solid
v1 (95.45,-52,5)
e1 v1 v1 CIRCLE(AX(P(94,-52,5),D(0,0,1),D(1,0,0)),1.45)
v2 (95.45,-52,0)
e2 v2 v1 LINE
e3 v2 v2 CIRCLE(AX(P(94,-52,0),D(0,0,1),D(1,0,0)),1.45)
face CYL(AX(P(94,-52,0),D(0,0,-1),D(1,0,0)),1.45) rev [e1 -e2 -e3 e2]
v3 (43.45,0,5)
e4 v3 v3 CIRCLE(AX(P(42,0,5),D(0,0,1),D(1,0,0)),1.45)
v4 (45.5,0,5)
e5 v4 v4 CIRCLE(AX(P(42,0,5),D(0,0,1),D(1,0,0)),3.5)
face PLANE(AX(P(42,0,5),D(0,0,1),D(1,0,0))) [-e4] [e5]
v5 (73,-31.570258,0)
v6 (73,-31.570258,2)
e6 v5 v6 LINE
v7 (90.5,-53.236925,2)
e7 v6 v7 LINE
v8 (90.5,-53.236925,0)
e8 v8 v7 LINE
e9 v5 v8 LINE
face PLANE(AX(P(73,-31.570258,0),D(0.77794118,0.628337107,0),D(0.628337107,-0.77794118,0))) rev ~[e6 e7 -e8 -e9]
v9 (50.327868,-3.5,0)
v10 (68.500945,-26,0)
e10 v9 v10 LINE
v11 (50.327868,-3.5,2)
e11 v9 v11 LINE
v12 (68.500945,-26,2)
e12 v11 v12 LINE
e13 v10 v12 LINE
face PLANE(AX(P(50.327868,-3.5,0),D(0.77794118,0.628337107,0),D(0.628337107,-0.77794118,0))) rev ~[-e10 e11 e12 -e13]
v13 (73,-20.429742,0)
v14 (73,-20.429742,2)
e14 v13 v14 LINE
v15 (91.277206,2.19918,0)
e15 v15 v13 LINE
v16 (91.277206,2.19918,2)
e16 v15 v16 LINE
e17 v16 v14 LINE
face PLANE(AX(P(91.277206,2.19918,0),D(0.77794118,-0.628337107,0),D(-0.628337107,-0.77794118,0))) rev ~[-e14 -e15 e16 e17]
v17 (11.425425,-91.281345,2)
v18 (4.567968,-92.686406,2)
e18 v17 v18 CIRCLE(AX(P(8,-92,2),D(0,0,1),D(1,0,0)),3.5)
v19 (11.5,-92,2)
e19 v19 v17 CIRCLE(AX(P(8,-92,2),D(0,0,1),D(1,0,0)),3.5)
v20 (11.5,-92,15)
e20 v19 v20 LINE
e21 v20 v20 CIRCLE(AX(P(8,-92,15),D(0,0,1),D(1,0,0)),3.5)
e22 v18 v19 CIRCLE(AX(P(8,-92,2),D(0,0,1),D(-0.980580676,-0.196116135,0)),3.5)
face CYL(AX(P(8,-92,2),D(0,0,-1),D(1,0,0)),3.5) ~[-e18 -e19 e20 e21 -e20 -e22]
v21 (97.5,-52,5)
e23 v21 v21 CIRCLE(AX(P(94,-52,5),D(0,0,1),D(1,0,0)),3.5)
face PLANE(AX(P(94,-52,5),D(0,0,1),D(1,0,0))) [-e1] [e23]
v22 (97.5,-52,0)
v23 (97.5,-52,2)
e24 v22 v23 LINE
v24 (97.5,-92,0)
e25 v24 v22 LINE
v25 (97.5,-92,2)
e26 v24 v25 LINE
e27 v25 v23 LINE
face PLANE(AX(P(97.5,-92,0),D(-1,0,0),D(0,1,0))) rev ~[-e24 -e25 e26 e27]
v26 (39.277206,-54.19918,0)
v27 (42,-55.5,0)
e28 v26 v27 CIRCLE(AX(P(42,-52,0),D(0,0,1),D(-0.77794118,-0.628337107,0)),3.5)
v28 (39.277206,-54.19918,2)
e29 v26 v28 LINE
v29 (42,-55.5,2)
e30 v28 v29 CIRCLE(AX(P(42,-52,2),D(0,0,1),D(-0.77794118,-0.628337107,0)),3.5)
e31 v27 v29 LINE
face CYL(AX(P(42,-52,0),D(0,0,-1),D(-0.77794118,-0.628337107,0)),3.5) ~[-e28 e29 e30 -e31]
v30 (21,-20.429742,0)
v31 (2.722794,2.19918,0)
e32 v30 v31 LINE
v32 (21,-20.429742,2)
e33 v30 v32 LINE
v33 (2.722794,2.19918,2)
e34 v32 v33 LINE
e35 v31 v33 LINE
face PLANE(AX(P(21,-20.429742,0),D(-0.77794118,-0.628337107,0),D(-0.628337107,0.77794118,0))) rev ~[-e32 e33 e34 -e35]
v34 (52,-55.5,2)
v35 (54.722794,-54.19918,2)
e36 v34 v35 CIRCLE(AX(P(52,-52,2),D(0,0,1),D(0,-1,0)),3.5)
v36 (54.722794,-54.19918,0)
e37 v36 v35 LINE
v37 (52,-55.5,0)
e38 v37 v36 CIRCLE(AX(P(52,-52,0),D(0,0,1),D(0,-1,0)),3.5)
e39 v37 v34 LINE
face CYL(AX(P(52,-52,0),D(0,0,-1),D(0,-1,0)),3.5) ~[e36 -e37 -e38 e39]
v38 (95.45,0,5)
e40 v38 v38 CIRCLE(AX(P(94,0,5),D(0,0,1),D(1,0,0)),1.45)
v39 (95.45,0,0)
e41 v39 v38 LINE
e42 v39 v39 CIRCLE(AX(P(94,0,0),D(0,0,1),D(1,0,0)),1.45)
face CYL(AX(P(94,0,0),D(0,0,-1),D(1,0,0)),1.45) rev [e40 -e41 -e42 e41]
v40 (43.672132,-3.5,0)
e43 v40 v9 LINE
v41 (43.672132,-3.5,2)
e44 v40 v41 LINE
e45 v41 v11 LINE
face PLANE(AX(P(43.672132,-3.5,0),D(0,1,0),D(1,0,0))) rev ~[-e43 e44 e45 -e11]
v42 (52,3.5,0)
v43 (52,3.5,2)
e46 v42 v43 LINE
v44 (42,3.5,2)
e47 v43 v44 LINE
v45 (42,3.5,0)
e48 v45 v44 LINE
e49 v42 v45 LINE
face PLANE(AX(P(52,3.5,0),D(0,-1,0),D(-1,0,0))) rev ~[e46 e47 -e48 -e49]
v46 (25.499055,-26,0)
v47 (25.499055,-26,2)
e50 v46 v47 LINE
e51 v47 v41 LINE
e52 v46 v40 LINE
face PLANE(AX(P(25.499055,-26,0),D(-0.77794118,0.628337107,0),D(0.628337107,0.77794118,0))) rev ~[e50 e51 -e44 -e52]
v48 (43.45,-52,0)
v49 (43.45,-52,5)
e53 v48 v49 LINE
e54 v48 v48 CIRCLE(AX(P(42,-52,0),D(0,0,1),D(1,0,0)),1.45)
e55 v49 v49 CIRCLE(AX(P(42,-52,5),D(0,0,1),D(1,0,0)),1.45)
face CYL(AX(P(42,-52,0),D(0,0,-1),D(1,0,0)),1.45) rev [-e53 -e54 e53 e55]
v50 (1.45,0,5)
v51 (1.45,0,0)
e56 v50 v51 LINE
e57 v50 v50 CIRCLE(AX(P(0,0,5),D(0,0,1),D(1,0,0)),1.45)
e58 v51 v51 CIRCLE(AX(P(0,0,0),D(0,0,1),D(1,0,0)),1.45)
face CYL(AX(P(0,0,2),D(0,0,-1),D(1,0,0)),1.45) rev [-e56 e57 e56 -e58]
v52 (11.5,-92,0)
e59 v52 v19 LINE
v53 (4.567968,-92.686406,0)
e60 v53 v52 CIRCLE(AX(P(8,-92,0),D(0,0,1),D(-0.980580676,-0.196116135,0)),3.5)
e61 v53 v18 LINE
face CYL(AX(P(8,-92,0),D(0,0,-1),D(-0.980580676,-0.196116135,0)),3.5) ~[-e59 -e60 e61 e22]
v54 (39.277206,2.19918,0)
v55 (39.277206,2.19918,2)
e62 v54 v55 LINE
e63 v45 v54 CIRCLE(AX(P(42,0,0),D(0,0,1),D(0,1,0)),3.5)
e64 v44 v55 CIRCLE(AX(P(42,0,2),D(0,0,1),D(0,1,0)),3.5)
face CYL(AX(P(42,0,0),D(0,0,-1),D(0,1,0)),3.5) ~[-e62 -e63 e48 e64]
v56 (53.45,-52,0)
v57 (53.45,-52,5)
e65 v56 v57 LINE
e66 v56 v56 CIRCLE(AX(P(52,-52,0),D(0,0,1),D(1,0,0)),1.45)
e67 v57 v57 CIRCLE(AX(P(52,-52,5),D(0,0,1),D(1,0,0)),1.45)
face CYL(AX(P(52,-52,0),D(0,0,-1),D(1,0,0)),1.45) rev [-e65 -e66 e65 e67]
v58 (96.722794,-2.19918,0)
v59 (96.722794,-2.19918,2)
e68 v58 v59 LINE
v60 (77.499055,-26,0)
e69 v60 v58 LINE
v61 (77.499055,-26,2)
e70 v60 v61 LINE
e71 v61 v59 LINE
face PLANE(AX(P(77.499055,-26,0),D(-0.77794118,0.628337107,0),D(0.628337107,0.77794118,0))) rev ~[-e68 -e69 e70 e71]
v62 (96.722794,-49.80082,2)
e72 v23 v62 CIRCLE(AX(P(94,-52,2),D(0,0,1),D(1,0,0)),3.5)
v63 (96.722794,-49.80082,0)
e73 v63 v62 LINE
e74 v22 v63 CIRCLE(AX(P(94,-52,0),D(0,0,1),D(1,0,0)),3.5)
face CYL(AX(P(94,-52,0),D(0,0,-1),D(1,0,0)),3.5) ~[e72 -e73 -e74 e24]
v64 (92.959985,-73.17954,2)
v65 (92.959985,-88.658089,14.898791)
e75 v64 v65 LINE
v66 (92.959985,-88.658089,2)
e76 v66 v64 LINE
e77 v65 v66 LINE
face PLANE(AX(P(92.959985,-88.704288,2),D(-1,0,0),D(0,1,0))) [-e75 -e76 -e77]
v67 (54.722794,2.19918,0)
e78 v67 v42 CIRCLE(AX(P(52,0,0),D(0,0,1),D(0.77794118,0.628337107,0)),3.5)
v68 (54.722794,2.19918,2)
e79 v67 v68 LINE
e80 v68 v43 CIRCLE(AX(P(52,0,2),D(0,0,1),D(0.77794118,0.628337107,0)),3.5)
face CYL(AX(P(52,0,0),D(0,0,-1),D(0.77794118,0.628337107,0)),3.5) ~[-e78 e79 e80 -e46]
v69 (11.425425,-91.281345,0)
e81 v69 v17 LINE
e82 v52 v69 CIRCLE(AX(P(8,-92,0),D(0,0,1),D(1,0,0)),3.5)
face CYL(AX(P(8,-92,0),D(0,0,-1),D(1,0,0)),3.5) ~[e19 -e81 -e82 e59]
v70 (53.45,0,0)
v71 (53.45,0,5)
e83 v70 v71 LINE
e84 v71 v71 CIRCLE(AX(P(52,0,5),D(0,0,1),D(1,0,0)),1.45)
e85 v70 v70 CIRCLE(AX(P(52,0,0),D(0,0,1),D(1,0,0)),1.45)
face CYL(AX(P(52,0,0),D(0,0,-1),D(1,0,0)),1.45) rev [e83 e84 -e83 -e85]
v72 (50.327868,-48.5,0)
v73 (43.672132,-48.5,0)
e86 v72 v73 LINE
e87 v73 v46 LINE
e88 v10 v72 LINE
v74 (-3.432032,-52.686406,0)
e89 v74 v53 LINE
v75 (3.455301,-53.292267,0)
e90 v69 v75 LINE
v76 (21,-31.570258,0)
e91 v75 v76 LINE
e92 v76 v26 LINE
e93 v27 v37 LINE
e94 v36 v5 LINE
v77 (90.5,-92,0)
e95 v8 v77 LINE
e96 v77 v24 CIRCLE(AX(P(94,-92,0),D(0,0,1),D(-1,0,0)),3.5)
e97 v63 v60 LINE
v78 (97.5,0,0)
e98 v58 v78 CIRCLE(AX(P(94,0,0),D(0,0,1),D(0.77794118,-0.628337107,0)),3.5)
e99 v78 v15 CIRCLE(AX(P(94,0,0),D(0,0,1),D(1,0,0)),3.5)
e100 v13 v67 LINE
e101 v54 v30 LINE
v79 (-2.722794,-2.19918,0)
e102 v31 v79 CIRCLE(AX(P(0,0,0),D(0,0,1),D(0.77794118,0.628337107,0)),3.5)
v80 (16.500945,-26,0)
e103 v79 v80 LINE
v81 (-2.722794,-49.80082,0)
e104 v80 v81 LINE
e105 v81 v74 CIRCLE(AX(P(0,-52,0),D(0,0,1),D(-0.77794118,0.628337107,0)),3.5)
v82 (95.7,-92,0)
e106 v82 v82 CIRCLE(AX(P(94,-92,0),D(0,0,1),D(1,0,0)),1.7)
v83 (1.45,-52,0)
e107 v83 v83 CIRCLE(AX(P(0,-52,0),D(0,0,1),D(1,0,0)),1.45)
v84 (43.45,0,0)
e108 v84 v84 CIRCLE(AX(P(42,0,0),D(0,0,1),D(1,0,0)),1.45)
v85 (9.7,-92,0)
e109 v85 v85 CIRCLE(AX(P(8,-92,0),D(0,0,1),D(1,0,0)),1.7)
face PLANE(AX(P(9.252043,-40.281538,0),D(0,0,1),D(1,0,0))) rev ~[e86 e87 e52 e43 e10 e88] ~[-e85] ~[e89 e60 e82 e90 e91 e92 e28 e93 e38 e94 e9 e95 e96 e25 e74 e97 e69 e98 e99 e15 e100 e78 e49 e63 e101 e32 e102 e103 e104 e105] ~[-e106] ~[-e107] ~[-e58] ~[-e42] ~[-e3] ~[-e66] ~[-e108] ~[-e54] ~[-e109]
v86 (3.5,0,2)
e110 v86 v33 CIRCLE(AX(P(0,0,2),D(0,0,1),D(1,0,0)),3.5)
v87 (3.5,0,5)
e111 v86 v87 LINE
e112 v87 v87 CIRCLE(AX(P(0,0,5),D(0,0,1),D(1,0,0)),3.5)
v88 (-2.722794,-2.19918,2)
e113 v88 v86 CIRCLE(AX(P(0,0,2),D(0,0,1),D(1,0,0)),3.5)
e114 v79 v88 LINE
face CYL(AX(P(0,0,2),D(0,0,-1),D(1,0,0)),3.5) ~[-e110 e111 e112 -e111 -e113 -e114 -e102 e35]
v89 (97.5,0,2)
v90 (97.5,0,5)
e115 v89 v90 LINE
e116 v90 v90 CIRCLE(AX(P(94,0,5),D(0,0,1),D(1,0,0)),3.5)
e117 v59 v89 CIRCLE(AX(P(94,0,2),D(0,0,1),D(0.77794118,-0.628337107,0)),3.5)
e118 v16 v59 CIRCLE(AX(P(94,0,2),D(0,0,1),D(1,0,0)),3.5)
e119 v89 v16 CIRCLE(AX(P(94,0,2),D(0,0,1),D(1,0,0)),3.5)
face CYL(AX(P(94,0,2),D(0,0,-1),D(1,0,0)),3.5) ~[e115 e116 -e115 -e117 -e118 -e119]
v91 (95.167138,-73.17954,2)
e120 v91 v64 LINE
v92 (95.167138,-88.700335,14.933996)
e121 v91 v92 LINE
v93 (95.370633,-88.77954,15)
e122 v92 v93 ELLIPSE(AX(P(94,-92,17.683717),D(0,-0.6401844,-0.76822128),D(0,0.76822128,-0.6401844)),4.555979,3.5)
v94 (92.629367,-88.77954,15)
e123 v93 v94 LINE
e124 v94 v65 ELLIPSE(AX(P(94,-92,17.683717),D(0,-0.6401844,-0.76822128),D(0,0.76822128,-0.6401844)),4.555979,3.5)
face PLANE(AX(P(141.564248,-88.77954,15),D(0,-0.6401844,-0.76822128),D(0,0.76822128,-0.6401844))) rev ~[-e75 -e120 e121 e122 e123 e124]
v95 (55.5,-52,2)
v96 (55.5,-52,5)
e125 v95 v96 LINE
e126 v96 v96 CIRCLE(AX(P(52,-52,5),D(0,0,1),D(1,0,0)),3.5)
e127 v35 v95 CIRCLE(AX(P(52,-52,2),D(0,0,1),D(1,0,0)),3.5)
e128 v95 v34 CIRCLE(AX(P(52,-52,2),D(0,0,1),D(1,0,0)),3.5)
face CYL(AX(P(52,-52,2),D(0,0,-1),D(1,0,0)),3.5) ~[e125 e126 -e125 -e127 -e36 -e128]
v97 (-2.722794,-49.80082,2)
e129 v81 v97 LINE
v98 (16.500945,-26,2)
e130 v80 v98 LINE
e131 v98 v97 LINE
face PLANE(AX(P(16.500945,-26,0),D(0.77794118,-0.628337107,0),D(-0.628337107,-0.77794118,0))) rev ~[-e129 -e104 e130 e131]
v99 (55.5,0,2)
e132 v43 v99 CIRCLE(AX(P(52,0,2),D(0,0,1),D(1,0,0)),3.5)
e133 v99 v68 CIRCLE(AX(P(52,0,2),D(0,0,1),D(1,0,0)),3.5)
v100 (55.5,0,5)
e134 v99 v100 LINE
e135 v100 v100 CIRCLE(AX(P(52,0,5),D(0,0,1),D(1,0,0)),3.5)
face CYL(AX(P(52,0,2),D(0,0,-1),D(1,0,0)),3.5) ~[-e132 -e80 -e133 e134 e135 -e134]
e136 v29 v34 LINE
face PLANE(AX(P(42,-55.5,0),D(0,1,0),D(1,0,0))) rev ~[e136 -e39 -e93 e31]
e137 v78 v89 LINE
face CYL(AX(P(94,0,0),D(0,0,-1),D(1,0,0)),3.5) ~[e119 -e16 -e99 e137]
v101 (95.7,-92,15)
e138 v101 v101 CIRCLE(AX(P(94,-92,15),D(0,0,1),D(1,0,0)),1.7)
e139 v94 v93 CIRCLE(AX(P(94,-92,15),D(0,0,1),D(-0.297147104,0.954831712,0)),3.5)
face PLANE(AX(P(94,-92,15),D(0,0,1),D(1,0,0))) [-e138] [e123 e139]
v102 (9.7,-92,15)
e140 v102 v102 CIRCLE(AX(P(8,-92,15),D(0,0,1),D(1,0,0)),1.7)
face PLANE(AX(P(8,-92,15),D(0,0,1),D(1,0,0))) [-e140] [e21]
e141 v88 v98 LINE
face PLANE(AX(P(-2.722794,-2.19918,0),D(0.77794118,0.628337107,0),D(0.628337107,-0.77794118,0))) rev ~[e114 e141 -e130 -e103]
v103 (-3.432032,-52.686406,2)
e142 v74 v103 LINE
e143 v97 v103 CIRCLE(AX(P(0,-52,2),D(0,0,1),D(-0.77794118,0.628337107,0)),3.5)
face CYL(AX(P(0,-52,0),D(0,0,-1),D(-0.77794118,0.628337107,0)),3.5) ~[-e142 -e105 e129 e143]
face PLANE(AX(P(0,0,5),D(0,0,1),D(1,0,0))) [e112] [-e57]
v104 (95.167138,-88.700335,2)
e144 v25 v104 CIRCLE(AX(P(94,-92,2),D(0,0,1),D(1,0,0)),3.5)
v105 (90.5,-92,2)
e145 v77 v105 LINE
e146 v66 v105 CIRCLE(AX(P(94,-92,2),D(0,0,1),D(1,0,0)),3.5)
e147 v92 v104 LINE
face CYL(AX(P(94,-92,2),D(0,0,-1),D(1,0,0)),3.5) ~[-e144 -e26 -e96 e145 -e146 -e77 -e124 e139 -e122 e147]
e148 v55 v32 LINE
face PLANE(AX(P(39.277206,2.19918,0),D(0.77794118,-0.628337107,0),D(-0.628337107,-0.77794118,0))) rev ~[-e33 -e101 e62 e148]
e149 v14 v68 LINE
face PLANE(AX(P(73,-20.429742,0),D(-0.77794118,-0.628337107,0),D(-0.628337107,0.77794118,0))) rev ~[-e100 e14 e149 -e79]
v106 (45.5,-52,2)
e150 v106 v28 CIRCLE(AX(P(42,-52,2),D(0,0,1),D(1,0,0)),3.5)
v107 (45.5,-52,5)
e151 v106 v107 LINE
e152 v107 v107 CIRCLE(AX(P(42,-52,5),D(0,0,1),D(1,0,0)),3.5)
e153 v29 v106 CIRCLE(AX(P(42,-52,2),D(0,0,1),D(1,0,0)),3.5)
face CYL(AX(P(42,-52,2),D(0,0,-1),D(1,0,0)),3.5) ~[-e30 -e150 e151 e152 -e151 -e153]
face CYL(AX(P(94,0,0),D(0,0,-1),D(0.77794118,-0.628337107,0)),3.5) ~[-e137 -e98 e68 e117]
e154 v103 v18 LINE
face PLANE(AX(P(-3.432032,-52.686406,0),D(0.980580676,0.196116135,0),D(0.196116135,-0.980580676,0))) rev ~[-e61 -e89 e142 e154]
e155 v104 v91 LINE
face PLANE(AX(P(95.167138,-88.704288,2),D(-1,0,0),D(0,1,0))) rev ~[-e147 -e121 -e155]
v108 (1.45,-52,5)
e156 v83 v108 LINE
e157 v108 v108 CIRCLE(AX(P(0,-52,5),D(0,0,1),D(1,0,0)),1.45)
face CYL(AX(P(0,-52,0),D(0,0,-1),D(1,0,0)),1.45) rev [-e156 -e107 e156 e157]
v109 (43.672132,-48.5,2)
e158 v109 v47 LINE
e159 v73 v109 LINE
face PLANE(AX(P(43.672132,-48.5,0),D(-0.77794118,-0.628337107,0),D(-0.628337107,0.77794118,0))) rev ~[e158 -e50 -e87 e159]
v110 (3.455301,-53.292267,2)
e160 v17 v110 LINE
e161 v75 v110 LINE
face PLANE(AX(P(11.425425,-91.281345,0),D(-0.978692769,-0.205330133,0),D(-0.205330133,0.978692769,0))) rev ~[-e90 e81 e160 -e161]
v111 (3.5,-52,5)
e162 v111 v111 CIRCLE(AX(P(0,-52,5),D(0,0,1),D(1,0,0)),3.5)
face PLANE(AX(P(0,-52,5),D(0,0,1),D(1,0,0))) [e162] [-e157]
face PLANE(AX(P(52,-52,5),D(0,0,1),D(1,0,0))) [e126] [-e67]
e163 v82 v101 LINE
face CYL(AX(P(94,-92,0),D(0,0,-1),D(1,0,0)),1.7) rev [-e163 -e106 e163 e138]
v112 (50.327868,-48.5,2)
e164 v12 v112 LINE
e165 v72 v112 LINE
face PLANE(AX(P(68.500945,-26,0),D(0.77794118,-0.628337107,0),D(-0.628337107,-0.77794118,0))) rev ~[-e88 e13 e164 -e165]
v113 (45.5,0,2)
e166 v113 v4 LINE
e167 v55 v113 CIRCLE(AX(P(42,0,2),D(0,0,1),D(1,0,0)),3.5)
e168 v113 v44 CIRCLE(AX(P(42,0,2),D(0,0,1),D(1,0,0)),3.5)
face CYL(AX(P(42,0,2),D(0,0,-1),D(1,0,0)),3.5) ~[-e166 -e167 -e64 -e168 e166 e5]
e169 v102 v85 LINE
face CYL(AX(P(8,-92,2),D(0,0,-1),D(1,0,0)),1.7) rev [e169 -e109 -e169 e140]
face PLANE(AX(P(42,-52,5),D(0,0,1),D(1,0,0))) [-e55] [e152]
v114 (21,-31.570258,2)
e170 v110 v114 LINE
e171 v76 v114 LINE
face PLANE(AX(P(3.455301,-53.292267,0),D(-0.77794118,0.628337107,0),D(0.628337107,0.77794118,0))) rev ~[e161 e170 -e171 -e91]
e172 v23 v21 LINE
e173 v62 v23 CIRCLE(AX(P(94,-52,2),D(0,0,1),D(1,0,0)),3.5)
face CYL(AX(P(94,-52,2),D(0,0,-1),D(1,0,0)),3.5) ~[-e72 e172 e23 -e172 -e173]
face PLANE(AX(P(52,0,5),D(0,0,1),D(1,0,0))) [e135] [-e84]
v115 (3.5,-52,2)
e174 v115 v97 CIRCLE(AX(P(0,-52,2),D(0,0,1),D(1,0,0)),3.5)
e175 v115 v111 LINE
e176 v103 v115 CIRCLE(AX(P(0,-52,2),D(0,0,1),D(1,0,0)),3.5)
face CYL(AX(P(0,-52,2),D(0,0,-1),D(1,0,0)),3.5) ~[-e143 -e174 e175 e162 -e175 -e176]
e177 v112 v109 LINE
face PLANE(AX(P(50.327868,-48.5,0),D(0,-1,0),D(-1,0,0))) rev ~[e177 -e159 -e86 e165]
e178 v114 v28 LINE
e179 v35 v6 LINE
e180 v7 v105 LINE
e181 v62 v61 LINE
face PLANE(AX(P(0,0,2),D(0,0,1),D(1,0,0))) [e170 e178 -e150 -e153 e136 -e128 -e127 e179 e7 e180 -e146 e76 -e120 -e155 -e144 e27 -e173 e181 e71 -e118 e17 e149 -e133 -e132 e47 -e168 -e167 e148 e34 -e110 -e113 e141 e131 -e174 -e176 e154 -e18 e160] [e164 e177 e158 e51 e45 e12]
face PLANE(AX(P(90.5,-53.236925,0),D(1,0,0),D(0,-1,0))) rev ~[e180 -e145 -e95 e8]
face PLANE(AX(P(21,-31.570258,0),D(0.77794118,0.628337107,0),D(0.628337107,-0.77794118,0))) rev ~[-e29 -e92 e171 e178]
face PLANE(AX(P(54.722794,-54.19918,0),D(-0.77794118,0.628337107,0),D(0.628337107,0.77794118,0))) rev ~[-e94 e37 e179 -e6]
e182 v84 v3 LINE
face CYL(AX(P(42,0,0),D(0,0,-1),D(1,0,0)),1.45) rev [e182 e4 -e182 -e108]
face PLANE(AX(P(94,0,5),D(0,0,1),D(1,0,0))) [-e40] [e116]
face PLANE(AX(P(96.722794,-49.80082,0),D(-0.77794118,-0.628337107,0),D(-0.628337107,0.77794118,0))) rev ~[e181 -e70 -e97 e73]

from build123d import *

# Parameters (mm, degrees)
F0_R        = 1.45
F0_R_2      = 1.7
F1_DEPTH    = 2
F2_R        = 3.5
F2_R_2      = 1.45
F3_DEPTH    = 3
F4_R        = 3.5
F4_R_2      = 1.7
F5_DEPTH    = 13
F6_W        = 2.2071525455
F6_H        = 17.9247483611
F7_DEPTH    = 13
F8_T4_DEPTH = 95.0013732124


# Not quite as in the source:
# - a fillet or chamfer that OpenCascade refuses, or shapes differently, is made with other operations: its cross-section is extruded or revolved along the edge and cut away or added


with BuildPart() as f1:
    # F0 (on Top) → F1 (new body)
    with BuildSketch(Plane.XY):
        with BuildLine():
            Line((21, -31.5702583224), (16.5009452012, -26))
            Line((16.5009452012, -26), (-2.7227941307, -49.8008201252))
            ThreePointArc((-2.7227941307, -49.8008201252), (0, -48.5), (2.7227941307, -49.8008201252))
            ThreePointArc((2.7227941307, -49.8008201252), (3.2999832922, -50.8337623436), (3.5, -52))
            ThreePointArc((3.5, -52), (3.4691335198, -52.4638023524), (3.3770785016, -52.9194241642))
            Line((3.3770785016, -52.9194241642), (3.4553009961, -53.2922666129))
            Line((3.4553009961, -53.2922666129), (21, -31.5702583224))
        make_face()
        with BuildLine():
            ThreePointArc((2.7227941307, 2.1991798748), (3.2999832922, 1.1662376564), (3.5, 0))
            ThreePointArc((3.5, 0), (1.1662376564, -3.2999832922), (-2.7227941307, -2.1991798748))
            Line((-2.7227941307, -2.1991798748), (16.5009452012, -26))
            Line((16.5009452012, -26), (21, -20.4297416776))
            Line((21, -20.4297416776), (2.7227941307, 2.1991798748))
        make_face()
        with BuildLine():
            Line((39.2772058693, 2.1991798748), (21, -20.4297416776))
            Line((21, -20.4297416776), (25.4990547988, -26))
            Line((25.4990547988, -26), (43.6721317219, -3.5))
            Line((43.6721317219, -3.5), (42, -3.5))
            ThreePointArc((42, -3.5), (38.841904881, -1.5087860084), (39.2772058693, 2.1991798748))
        make_face()
        Polygon((25.4990547988, -26), (21, -20.4297416776), (16.5009452012, -26), (21, -31.5702583224), align=None)
        with BuildLine():
            Line((43.6721317219, -48.5), (25.4990547988, -26))
            Line((25.4990547988, -26), (21, -31.5702583224))
            Line((21, -31.5702583224), (39.2772058693, -54.1991798748))
            ThreePointArc((39.2772058693, -54.1991798748), (38.841904881, -50.4912139916), (42, -48.5))
            Line((42, -48.5), (43.6721317219, -48.5))
        make_face()
        with BuildLine():
            Line((50.3278682781, -48.5), (43.6721317219, -48.5))
            Line((43.6721317219, -48.5), (44.7227941307, -49.8008201252))
            ThreePointArc((44.7227941307, -49.8008201252), (45.2999832922, -50.8337623436), (45.5, -52))
            ThreePointArc((45.5, -52), (44.4748737342, -54.4748737342), (42, -55.5))
            Line((42, -55.5), (52, -55.5))
            ThreePointArc((52, -55.5), (48.841904881, -53.5087860084), (49.2772058693, -49.8008201252))
            Line((49.2772058693, -49.8008201252), (50.3278682781, -48.5))
        make_face()
        with BuildLine():
            Line((11.425424692, -91.2813445337), (3.4553009961, -53.2922666129))
            Line((3.4553009961, -53.2922666129), (2.7227941307, -54.1991798748))
            ThreePointArc((2.7227941307, -54.1991798748), (-0.8353894658, -55.3988416322), (-3.4320323649, -52.686406473))
            Line((-3.4320323649, -52.686406473), (4.5679676351, -92.686406473))
            ThreePointArc((4.5679676351, -92.686406473), (7.2974612618, -88.5712335569), (11.425424692, -91.2813445337))
        make_face()
        with BuildLine():
            Line((68.5009452012, -26), (50.3278682781, -48.5))
            Line((50.3278682781, -48.5), (52, -48.5))
            ThreePointArc((52, -48.5), (54.4748737342, -49.5251262658), (55.5, -52))
            ThreePointArc((55.5, -52), (55.2999832922, -53.1662376564), (54.7227941307, -54.1991798748))
            Line((54.7227941307, -54.1991798748), (73, -31.5702583224))
            Line((73, -31.5702583224), (68.5009452012, -26))
        make_face()
        with BuildLine():
            Line((52, -3.5), (50.3278682781, -3.5))
            Line((50.3278682781, -3.5), (68.5009452012, -26))
            Line((68.5009452012, -26), (73, -20.4297416776))
            Line((73, -20.4297416776), (54.7227941307, 2.1991798748))
            ThreePointArc((54.7227941307, 2.1991798748), (55.2999832922, 1.1662376564), (55.5, 0))
            ThreePointArc((55.5, 0), (54.4748737342, -2.4748737342), (52, -3.5))
        make_face()
        with BuildLine():
            Line((44.7227941307, -2.1991798748), (43.6721317219, -3.5))
            Line((43.6721317219, -3.5), (50.3278682781, -3.5))
            Line((50.3278682781, -3.5), (49.2772058693, -2.1991798748))
            ThreePointArc((49.2772058693, -2.1991798748), (48.841904881, 1.5087860084), (52, 3.5))
            Line((52, 3.5), (42, 3.5))
            ThreePointArc((42, 3.5), (44.4748737342, 2.4748737342), (45.5, 0))
            ThreePointArc((45.5, 0), (45.2999832922, -1.1662376564), (44.7227941307, -2.1991798748))
        make_face()
        Polygon((73, -20.4297416776), (68.5009452012, -26), (73, -31.5702583224), (77.4990547988, -26), align=None)
        with BuildLine():
            Line((91.2772058693, 2.1991798748), (73, -20.4297416776))
            Line((73, -20.4297416776), (77.4990547988, -26))
            Line((77.4990547988, -26), (96.7227941307, -2.1991798748))
            ThreePointArc((96.7227941307, -2.1991798748), (91.8008201252, -2.7227941307), (91.2772058693, 2.1991798748))
        make_face()
        with BuildLine():
            Line((77.4990547988, -26), (73, -31.5702583224))
            Line((73, -31.5702583224), (90.5, -53.236924989))
            Line((90.5, -53.236924989), (90.5, -52))
            ThreePointArc((90.5, -52), (92.8337623436, -48.7000167078), (96.7227941307, -49.8008201252))
            Line((96.7227941307, -49.8008201252), (77.4990547988, -26))
        make_face()
        with BuildLine():
            Line((91.2772058693, -54.1991798748), (90.5, -53.236924989))
            Line((90.5, -53.236924989), (90.5, -92))
            ThreePointArc((90.5, -92), (94, -88.5), (97.5, -92))
            Line((97.5, -92), (97.5, -52))
            ThreePointArc((97.5, -52), (95.1662376564, -55.2999832922), (91.2772058693, -54.1991798748))
        make_face()
        with BuildLine():
            ThreePointArc((-2.7227941307, -2.1991798748), (1.1662376564, -3.2999832922), (3.5, 0))
            ThreePointArc((3.5, 0), (3.2999832922, 1.1662376564), (2.7227941307, 2.1991798748))
            ThreePointArc((2.7227941307, 2.1991798748), (-2.1991798748, 2.7227941307), (-2.7227941307, -2.1991798748))
        make_face()
        Circle(F0_R, mode=Mode.SUBTRACT)
        with BuildLine():
            ThreePointArc((42, 3.5), (40.4912139916, 3.158095119), (39.2772058693, 2.1991798748))
            ThreePointArc((39.2772058693, 2.1991798748), (38.841904881, -1.5087860084), (42, -3.5))
            ThreePointArc((42, -3.5), (43.5087860084, -3.158095119), (44.7227941307, -2.1991798748))
            ThreePointArc((44.7227941307, -2.1991798748), (45.2999832922, -1.1662376564), (45.5, 0))
            ThreePointArc((45.5, 0), (44.4748737342, 2.4748737342), (42, 3.5))
        make_face()
        with Locations((42, 0)):
            Circle(F0_R, mode=Mode.SUBTRACT)
        with BuildLine():
            ThreePointArc((54.7227941307, 2.1991798748), (53.5087860084, 3.158095119), (52, 3.5))
            ThreePointArc((52, 3.5), (48.841904881, 1.5087860084), (49.2772058693, -2.1991798748))
            ThreePointArc((49.2772058693, -2.1991798748), (50.4912139916, -3.158095119), (52, -3.5))
            ThreePointArc((52, -3.5), (54.4748737342, -2.4748737342), (55.5, 0))
            ThreePointArc((55.5, 0), (55.2999832922, 1.1662376564), (54.7227941307, 2.1991798748))
        make_face()
        with Locations((52, 0)):
            Circle(F0_R, mode=Mode.SUBTRACT)
        with BuildLine():
            ThreePointArc((97.5, 0), (95.1662376564, 3.2999832922), (91.2772058693, 2.1991798748))
            ThreePointArc((91.2772058693, 2.1991798748), (91.8008201252, -2.7227941307), (96.7227941307, -2.1991798748))
            ThreePointArc((96.7227941307, -2.1991798748), (97.2999832922, -1.1662376564), (97.5, 0))
        make_face()
        with Locations((94, 0)):
            Circle(F0_R, mode=Mode.SUBTRACT)
        with BuildLine():
            ThreePointArc((97.5, -52), (97.2999832922, -50.8337623436), (96.7227941307, -49.8008201252))
            ThreePointArc((96.7227941307, -49.8008201252), (92.8337623436, -48.7000167078), (90.5, -52))
            ThreePointArc((90.5, -52), (90.7000167078, -53.1662376564), (91.2772058693, -54.1991798748))
            ThreePointArc((91.2772058693, -54.1991798748), (95.1662376564, -55.2999832922), (97.5, -52))
        make_face()
        with Locations((94, -52)):
            Circle(F0_R, mode=Mode.SUBTRACT)
        with BuildLine():
            ThreePointArc((97.5, -92), (94, -88.5), (90.5, -92))
            ThreePointArc((90.5, -92), (94, -95.5), (97.5, -92))
        make_face()
        with Locations((94, -92)):
            Circle(F0_R_2, mode=Mode.SUBTRACT)
        with BuildLine():
            ThreePointArc((52, -48.5), (50.4912139916, -48.841904881), (49.2772058693, -49.8008201252))
            ThreePointArc((49.2772058693, -49.8008201252), (48.841904881, -53.5087860084), (52, -55.5))
            ThreePointArc((52, -55.5), (53.5087860084, -55.158095119), (54.7227941307, -54.1991798748))
            ThreePointArc((54.7227941307, -54.1991798748), (55.2999832922, -53.1662376564), (55.5, -52))
            ThreePointArc((55.5, -52), (54.4748737342, -49.5251262658), (52, -48.5))
        make_face()
        with Locations((52, -52)):
            Circle(F0_R, mode=Mode.SUBTRACT)
        with BuildLine():
            ThreePointArc((42, -48.5), (38.841904881, -50.4912139916), (39.2772058693, -54.1991798748))
            ThreePointArc((39.2772058693, -54.1991798748), (40.4912139916, -55.158095119), (42, -55.5))
            ThreePointArc((42, -55.5), (44.4748737342, -54.4748737342), (45.5, -52))
            ThreePointArc((45.5, -52), (45.2999832922, -50.8337623436), (44.7227941307, -49.8008201252))
            ThreePointArc((44.7227941307, -49.8008201252), (43.5087860084, -48.841904881), (42, -48.5))
        make_face()
        with Locations((42, -52)):
            Circle(F0_R, mode=Mode.SUBTRACT)
        with BuildLine():
            ThreePointArc((11.5, -92), (11.4813062507, -91.6387427662), (11.425424692, -91.2813445337))
            ThreePointArc((11.425424692, -91.2813445337), (7.2974612618, -88.5712335569), (4.5679676351, -92.686406473))
            ThreePointArc((4.5679676351, -92.686406473), (8.3448816629, -95.4829666433), (11.5, -92))
        make_face()
        with Locations((8, -92)):
            Circle(F0_R_2, mode=Mode.SUBTRACT)
        with BuildLine():
            Line((2.7227941307, -54.1991798748), (3.4553009961, -53.2922666129))
            Line((3.4553009961, -53.2922666129), (3.3770785016, -52.9194241642))
            ThreePointArc((3.3770785016, -52.9194241642), (3.1163368243, -53.5932497599), (2.7227941307, -54.1991798748))
        make_face()
        with BuildLine():
            ThreePointArc((3.5, -52), (3.2999832922, -50.8337623436), (2.7227941307, -49.8008201252))
            Line((2.7227941307, -49.8008201252), (3.3770785016, -52.9194241642))
            ThreePointArc((3.3770785016, -52.9194241642), (3.4691335198, -52.4638023524), (3.5, -52))
        make_face()
        with BuildLine():
            ThreePointArc((2.7227941307, -49.8008201252), (0, -48.5), (-2.7227941307, -49.8008201252))
            ThreePointArc((-2.7227941307, -49.8008201252), (-3.3988416322, -51.1646105342), (-3.4320323649, -52.686406473))
            ThreePointArc((-3.4320323649, -52.686406473), (-0.8353894658, -55.3988416322), (2.7227941307, -54.1991798748))
            ThreePointArc((2.7227941307, -54.1991798748), (3.1163368243, -53.5932497599), (3.3770785016, -52.9194241642))
            Line((3.3770785016, -52.9194241642), (2.7227941307, -49.8008201252))
        make_face()
        with Locations((0, -52)):
            Circle(F0_R, mode=Mode.SUBTRACT)
        with BuildLine():
            Line((44.7227941307, -49.8008201252), (43.6721317219, -48.5))
            Line((43.6721317219, -48.5), (42, -48.5))
            ThreePointArc((42, -48.5), (43.5087860084, -48.841904881), (44.7227941307, -49.8008201252))
        make_face()
        with BuildLine():
            Line((52, -48.5), (50.3278682781, -48.5))
            Line((50.3278682781, -48.5), (49.2772058693, -49.8008201252))
            ThreePointArc((49.2772058693, -49.8008201252), (50.4912139916, -48.841904881), (52, -48.5))
        make_face()
        with BuildLine():
            Line((42, -3.5), (43.6721317219, -3.5))
            Line((43.6721317219, -3.5), (44.7227941307, -2.1991798748))
            ThreePointArc((44.7227941307, -2.1991798748), (43.5087860084, -3.158095119), (42, -3.5))
        make_face()
        with BuildLine():
            Line((49.2772058693, -2.1991798748), (50.3278682781, -3.5))
            Line((50.3278682781, -3.5), (52, -3.5))
            ThreePointArc((52, -3.5), (50.4912139916, -3.158095119), (49.2772058693, -2.1991798748))
        make_face()
        with BuildLine():
            Line((90.5, -52), (90.5, -53.236924989))
            Line((90.5, -53.236924989), (91.2772058693, -54.1991798748))
            ThreePointArc((91.2772058693, -54.1991798748), (90.7000167078, -53.1662376564), (90.5, -52))
        make_face()
    extrude(amount=F1_DEPTH)

    # F2 (on face) → F3 (join)
    with BuildSketch(Plane.XY.offset(2)):
        Circle(F2_R)
        Circle(F2_R_2, mode=Mode.SUBTRACT)
        with Locations((42, 0)):
            Circle(F2_R)
        with Locations((42, 0)):
            Circle(F2_R_2, mode=Mode.SUBTRACT)
        with Locations((42, -52)):
            Circle(F2_R)
        with Locations((42, -52)):
            Circle(F2_R_2, mode=Mode.SUBTRACT)
        with Locations((0, -52)):
            Circle(F2_R)
        with Locations((0, -52)):
            Circle(F2_R_2, mode=Mode.SUBTRACT)
        with Locations((52, 0)):
            Circle(F2_R)
        with Locations((52, 0)):
            Circle(F2_R_2, mode=Mode.SUBTRACT)
        with Locations((94, 0)):
            Circle(F2_R)
        with Locations((94, 0)):
            Circle(F2_R_2, mode=Mode.SUBTRACT)
        with Locations((94, -52)):
            Circle(F2_R)
        with Locations((94, -52)):
            Circle(F2_R_2, mode=Mode.SUBTRACT)
        with Locations((52, -52)):
            Circle(F2_R)
        with Locations((52, -52)):
            Circle(F2_R_2, mode=Mode.SUBTRACT)
    extrude(amount=F3_DEPTH)

    # F4 (on face) → F5 (join)
    with BuildSketch(Plane.XY.offset(2)):
        with Locations((8, -92)):
            Circle(F4_R)
        with Locations((8, -92)):
            Circle(F4_R_2, mode=Mode.SUBTRACT)
        with Locations((94, -92)):
            Circle(F4_R)
        with Locations((94, -92)):
            Circle(F4_R_2, mode=Mode.SUBTRACT)
    extrude(amount=F5_DEPTH)

    # F6 (on face) → F7 (join)
    with BuildSketch(Plane.XY.offset(2)):
        with Locations((94.0635614097, -79.7419138253)):
            Rectangle(F6_W, F6_H)
    extrude(amount=F7_DEPTH)

    # F8: chamfer of 15 x 18 on 1 edges, made by hand


with BuildPart() as f8_tool2:
    # F8_s3 → F8_t4 (new body)
    with BuildSketch(Plane.YZ.offset(141.5642480159)):
        Polygon((-88.7795396447, 15), (-70.7795396447, 0), (-70.7795396447, 15), align=None)
    extrude(amount=-F8_T4_DEPTH)

    split(bisect_by=Plane.XY.offset(2), keep=Keep.TOP)


with BuildPart() as f1_1:
    add(f1.part)

    # F8_t1: cut F8_tool2
    add(f8_tool2.part, mode=Mode.SUBTRACT)


solid = f1_1.part
